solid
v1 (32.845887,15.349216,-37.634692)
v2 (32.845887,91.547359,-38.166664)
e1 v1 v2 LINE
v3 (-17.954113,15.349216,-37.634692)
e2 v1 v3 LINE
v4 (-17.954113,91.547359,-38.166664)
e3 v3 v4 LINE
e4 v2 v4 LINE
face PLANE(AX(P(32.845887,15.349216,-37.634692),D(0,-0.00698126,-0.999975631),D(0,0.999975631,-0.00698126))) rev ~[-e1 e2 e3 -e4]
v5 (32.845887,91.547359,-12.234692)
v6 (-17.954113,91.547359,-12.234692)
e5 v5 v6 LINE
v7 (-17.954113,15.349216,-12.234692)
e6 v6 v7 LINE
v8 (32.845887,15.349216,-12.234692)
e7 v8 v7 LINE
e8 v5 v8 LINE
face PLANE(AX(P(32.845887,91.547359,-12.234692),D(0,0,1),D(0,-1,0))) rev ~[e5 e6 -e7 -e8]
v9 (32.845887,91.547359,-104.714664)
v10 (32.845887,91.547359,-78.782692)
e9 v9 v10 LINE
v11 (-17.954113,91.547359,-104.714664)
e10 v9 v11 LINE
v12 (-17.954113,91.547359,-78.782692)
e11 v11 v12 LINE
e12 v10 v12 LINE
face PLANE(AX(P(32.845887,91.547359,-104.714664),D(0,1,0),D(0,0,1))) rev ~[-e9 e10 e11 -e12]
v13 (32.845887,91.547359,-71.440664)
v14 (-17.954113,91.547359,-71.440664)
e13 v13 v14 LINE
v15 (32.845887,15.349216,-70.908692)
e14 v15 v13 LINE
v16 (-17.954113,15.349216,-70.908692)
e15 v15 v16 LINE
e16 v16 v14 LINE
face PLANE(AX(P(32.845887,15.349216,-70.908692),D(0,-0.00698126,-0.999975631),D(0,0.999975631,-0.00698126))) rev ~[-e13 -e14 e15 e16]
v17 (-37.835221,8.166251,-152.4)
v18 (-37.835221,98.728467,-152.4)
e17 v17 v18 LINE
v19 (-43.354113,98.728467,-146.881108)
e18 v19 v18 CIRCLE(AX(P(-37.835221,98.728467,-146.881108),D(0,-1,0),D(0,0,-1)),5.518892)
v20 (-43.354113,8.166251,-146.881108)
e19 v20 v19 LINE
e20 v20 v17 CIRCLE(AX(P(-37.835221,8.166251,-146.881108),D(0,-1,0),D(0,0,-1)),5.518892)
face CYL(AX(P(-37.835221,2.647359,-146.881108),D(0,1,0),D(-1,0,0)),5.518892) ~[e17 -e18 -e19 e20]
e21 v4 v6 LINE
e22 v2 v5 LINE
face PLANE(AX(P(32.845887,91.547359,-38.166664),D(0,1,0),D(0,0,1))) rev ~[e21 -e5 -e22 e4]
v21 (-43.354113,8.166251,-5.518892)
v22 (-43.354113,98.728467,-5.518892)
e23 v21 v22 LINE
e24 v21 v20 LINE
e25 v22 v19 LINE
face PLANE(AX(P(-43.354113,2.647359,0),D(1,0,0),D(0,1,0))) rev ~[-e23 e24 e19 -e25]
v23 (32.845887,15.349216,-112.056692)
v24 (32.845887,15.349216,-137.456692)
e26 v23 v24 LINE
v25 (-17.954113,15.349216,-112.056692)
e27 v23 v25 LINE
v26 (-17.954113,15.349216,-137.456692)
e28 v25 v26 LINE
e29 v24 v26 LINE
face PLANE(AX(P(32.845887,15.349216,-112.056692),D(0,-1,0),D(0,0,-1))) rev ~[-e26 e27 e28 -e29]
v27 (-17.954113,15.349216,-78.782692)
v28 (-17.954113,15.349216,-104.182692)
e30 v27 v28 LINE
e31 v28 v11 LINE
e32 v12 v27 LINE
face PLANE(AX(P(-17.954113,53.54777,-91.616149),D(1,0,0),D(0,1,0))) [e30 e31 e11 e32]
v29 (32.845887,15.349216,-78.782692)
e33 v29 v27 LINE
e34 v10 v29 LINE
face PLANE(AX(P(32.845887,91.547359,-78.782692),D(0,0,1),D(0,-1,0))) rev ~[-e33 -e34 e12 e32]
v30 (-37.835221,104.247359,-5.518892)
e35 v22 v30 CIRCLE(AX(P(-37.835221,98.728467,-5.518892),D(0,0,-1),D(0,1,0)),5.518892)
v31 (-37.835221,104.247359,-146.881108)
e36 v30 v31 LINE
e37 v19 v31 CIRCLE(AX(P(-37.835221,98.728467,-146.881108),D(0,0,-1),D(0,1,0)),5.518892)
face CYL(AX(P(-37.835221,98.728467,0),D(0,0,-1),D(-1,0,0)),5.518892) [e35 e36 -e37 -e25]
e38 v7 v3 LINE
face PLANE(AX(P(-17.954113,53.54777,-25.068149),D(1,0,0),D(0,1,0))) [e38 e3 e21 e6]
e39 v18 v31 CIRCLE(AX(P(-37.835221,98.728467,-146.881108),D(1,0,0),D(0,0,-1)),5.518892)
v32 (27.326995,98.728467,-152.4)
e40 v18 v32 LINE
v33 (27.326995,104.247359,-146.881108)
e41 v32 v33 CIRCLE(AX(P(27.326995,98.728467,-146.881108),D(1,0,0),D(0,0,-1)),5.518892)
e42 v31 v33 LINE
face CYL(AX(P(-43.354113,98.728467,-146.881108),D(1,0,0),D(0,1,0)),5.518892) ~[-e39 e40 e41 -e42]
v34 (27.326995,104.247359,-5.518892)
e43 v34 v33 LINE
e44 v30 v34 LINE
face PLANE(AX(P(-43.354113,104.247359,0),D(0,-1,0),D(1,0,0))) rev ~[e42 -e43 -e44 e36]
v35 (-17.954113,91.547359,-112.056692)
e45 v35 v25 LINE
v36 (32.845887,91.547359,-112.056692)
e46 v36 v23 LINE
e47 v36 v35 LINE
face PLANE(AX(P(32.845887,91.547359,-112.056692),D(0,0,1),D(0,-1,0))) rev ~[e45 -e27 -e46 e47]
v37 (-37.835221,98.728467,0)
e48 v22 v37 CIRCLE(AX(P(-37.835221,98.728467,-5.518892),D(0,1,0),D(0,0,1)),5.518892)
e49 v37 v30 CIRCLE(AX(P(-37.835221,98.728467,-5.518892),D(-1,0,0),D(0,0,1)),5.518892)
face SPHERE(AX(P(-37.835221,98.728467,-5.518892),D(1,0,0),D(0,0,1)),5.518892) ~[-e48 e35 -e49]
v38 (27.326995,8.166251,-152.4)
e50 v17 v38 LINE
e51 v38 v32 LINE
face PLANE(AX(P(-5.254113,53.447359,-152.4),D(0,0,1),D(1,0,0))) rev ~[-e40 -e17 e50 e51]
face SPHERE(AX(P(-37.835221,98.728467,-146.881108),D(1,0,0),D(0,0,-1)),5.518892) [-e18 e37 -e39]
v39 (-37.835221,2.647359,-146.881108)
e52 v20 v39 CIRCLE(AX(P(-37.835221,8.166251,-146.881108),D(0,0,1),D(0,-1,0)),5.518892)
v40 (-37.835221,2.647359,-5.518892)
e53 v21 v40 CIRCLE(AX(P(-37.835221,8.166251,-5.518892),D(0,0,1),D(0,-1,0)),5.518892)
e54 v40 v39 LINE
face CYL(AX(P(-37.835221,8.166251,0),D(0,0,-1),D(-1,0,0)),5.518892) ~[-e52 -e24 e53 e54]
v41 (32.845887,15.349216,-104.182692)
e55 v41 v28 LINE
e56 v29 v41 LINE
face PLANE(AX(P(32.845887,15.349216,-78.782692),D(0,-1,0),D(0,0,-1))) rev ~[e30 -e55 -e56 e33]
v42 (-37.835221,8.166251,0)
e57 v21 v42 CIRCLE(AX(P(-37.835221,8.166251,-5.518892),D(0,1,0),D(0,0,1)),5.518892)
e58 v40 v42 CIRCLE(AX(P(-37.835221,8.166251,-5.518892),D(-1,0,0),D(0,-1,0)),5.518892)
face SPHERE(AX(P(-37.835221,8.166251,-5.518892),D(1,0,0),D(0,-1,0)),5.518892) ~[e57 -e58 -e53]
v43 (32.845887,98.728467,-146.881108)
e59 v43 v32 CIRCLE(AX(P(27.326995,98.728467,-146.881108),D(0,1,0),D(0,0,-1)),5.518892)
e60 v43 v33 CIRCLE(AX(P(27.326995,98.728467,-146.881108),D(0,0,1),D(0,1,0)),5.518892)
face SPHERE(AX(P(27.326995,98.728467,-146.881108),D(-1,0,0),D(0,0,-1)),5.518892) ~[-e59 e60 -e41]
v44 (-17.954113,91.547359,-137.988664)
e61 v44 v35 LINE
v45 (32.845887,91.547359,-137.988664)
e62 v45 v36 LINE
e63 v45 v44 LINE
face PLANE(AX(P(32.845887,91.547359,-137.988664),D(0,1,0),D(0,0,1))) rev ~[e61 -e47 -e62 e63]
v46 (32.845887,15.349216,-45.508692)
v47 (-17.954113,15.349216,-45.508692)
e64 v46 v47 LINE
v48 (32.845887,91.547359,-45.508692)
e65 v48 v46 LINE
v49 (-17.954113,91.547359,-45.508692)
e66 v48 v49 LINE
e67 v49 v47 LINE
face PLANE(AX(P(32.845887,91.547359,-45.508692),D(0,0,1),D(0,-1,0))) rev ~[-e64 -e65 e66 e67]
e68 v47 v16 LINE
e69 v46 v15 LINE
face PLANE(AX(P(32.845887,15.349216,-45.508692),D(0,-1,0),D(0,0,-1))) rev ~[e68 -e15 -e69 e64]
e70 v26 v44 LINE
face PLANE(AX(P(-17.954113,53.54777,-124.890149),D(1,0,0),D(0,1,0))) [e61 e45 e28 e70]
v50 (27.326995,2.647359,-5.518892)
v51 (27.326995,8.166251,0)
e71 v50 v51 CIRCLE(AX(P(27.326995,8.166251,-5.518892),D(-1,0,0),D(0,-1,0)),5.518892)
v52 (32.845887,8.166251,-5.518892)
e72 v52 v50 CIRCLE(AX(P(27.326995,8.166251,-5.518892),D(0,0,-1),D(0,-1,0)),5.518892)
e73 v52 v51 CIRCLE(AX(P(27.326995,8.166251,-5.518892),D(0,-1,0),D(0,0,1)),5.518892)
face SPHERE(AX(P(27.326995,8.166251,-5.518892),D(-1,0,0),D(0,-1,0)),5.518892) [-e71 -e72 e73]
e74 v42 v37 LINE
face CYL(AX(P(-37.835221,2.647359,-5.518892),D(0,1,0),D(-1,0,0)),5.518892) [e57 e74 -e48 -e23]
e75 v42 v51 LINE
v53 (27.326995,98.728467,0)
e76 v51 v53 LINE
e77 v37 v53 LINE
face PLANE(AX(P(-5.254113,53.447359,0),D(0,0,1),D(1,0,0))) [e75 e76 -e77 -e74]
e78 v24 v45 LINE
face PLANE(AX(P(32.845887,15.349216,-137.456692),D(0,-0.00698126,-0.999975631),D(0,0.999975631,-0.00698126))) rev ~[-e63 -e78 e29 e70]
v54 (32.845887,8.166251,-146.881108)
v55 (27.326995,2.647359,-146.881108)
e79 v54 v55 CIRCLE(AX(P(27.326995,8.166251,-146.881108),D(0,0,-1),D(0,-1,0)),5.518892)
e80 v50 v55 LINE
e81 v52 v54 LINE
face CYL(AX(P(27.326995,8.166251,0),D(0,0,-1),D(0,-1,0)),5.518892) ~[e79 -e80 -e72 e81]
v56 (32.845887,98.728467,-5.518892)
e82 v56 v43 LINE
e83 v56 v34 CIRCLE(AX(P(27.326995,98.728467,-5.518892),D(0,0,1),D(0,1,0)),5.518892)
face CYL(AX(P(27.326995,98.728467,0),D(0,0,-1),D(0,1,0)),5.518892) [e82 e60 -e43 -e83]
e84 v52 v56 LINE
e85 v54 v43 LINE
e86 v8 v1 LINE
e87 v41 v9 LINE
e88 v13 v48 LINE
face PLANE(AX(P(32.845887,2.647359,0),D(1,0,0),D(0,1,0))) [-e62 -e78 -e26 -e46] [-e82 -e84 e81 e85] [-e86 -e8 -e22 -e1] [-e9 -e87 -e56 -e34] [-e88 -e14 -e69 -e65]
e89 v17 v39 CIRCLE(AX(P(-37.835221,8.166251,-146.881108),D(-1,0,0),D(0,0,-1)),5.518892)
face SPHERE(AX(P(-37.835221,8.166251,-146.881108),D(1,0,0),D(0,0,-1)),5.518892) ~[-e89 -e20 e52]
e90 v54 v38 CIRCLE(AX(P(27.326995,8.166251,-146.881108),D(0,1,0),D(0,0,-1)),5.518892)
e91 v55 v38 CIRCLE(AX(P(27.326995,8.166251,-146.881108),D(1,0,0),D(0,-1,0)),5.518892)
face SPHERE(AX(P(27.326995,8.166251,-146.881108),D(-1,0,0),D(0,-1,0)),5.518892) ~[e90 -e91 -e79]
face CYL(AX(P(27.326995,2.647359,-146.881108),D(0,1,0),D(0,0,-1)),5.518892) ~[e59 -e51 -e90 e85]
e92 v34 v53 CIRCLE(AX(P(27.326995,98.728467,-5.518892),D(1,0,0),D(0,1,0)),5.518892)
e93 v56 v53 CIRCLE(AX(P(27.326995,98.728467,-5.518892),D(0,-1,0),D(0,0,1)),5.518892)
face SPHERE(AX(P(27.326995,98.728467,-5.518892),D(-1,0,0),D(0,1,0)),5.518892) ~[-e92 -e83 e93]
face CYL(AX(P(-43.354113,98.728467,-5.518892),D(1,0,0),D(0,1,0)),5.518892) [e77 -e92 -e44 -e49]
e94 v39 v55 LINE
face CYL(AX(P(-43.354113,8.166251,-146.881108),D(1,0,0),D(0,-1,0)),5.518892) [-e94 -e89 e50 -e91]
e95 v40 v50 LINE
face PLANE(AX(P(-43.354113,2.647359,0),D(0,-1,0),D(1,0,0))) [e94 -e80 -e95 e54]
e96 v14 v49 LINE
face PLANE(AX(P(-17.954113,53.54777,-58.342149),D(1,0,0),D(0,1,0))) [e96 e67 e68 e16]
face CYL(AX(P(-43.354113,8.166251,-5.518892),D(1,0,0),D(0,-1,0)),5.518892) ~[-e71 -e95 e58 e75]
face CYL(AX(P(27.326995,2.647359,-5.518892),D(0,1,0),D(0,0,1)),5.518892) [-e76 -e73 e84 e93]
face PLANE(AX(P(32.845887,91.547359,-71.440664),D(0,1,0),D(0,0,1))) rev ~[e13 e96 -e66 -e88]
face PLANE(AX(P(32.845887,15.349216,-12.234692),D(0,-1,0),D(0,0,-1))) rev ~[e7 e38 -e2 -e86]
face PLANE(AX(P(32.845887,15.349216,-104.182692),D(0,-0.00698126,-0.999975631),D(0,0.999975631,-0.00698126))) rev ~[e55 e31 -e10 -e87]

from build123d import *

# Parameters (mm, degrees)
F0_W     = 76.2
F0_H     = 101.6
F1_DEPTH = 152.4
F3_DEPTH = 50.8
F4_R     = 5.5188922036


# Not quite as in the source:
# - a feature names something its author has since deleted; it is built from what else it names


with BuildPart() as f1:
    # F0 (on Top) → F1 (new body)
    with BuildSketch(Plane.XY):
        with Locations((-5.2541131154, 53.4473587833)):
            Rectangle(F0_W, F0_H)
    extrude(amount=-F1_DEPTH)

    # F2 (on face) → F3 (cut)
    with BuildSketch(Plane.YZ.offset(32.8458868846)):
        Polygon((15.3492157235, -137.4566919493), (91.5473587833, -137.988663984), (91.5473587833, -112.0566919493), (15.3492157235, -112.0566919493), align=None)
        Polygon((15.3492157235, -78.7826919493), (15.3492157235, -104.1826919493), (91.5473587833, -104.714663984), (91.5473587833, -78.7826919493), align=None)
        Polygon((15.3492157235, -45.5086919493), (15.3492157235, -70.9086919493), (91.5473587833, -71.440663984), (91.5473587833, -45.5086919493), align=None)
        Polygon((15.3492157235, -12.2346919493), (15.3492157235, -37.6346919493), (91.5473587833, -38.166663984), (91.5473587833, -12.2346919493), align=None)
    extrude(amount=-F3_DEPTH, mode=Mode.SUBTRACT)

    # F4
    f4_edges = [f1.edges().sort_by_distance(p)[0] for p in [
        (-5.254113, 104.247359, 0),
        (-5.254113, 2.647359, 0),
        (-5.254113, 2.647359, -152.4),
        (-5.254113, 104.247359, -152.4),
        (32.845887, 2.647359, -76.2),
        (32.845887, 53.447359, -152.4),
        (32.845887, 104.247359, -76.2),
        (-43.354113, 53.447359, -152.4),
        (-43.354113, 2.647359, -76.2),
        (32.845887, 53.447359, 0),
        (-43.354113, 53.447359, 0),
        (-43.354113, 104.247359, -76.2),
    ]]
    fillet(f4_edges, radius=F4_R)


solid = f1.part
